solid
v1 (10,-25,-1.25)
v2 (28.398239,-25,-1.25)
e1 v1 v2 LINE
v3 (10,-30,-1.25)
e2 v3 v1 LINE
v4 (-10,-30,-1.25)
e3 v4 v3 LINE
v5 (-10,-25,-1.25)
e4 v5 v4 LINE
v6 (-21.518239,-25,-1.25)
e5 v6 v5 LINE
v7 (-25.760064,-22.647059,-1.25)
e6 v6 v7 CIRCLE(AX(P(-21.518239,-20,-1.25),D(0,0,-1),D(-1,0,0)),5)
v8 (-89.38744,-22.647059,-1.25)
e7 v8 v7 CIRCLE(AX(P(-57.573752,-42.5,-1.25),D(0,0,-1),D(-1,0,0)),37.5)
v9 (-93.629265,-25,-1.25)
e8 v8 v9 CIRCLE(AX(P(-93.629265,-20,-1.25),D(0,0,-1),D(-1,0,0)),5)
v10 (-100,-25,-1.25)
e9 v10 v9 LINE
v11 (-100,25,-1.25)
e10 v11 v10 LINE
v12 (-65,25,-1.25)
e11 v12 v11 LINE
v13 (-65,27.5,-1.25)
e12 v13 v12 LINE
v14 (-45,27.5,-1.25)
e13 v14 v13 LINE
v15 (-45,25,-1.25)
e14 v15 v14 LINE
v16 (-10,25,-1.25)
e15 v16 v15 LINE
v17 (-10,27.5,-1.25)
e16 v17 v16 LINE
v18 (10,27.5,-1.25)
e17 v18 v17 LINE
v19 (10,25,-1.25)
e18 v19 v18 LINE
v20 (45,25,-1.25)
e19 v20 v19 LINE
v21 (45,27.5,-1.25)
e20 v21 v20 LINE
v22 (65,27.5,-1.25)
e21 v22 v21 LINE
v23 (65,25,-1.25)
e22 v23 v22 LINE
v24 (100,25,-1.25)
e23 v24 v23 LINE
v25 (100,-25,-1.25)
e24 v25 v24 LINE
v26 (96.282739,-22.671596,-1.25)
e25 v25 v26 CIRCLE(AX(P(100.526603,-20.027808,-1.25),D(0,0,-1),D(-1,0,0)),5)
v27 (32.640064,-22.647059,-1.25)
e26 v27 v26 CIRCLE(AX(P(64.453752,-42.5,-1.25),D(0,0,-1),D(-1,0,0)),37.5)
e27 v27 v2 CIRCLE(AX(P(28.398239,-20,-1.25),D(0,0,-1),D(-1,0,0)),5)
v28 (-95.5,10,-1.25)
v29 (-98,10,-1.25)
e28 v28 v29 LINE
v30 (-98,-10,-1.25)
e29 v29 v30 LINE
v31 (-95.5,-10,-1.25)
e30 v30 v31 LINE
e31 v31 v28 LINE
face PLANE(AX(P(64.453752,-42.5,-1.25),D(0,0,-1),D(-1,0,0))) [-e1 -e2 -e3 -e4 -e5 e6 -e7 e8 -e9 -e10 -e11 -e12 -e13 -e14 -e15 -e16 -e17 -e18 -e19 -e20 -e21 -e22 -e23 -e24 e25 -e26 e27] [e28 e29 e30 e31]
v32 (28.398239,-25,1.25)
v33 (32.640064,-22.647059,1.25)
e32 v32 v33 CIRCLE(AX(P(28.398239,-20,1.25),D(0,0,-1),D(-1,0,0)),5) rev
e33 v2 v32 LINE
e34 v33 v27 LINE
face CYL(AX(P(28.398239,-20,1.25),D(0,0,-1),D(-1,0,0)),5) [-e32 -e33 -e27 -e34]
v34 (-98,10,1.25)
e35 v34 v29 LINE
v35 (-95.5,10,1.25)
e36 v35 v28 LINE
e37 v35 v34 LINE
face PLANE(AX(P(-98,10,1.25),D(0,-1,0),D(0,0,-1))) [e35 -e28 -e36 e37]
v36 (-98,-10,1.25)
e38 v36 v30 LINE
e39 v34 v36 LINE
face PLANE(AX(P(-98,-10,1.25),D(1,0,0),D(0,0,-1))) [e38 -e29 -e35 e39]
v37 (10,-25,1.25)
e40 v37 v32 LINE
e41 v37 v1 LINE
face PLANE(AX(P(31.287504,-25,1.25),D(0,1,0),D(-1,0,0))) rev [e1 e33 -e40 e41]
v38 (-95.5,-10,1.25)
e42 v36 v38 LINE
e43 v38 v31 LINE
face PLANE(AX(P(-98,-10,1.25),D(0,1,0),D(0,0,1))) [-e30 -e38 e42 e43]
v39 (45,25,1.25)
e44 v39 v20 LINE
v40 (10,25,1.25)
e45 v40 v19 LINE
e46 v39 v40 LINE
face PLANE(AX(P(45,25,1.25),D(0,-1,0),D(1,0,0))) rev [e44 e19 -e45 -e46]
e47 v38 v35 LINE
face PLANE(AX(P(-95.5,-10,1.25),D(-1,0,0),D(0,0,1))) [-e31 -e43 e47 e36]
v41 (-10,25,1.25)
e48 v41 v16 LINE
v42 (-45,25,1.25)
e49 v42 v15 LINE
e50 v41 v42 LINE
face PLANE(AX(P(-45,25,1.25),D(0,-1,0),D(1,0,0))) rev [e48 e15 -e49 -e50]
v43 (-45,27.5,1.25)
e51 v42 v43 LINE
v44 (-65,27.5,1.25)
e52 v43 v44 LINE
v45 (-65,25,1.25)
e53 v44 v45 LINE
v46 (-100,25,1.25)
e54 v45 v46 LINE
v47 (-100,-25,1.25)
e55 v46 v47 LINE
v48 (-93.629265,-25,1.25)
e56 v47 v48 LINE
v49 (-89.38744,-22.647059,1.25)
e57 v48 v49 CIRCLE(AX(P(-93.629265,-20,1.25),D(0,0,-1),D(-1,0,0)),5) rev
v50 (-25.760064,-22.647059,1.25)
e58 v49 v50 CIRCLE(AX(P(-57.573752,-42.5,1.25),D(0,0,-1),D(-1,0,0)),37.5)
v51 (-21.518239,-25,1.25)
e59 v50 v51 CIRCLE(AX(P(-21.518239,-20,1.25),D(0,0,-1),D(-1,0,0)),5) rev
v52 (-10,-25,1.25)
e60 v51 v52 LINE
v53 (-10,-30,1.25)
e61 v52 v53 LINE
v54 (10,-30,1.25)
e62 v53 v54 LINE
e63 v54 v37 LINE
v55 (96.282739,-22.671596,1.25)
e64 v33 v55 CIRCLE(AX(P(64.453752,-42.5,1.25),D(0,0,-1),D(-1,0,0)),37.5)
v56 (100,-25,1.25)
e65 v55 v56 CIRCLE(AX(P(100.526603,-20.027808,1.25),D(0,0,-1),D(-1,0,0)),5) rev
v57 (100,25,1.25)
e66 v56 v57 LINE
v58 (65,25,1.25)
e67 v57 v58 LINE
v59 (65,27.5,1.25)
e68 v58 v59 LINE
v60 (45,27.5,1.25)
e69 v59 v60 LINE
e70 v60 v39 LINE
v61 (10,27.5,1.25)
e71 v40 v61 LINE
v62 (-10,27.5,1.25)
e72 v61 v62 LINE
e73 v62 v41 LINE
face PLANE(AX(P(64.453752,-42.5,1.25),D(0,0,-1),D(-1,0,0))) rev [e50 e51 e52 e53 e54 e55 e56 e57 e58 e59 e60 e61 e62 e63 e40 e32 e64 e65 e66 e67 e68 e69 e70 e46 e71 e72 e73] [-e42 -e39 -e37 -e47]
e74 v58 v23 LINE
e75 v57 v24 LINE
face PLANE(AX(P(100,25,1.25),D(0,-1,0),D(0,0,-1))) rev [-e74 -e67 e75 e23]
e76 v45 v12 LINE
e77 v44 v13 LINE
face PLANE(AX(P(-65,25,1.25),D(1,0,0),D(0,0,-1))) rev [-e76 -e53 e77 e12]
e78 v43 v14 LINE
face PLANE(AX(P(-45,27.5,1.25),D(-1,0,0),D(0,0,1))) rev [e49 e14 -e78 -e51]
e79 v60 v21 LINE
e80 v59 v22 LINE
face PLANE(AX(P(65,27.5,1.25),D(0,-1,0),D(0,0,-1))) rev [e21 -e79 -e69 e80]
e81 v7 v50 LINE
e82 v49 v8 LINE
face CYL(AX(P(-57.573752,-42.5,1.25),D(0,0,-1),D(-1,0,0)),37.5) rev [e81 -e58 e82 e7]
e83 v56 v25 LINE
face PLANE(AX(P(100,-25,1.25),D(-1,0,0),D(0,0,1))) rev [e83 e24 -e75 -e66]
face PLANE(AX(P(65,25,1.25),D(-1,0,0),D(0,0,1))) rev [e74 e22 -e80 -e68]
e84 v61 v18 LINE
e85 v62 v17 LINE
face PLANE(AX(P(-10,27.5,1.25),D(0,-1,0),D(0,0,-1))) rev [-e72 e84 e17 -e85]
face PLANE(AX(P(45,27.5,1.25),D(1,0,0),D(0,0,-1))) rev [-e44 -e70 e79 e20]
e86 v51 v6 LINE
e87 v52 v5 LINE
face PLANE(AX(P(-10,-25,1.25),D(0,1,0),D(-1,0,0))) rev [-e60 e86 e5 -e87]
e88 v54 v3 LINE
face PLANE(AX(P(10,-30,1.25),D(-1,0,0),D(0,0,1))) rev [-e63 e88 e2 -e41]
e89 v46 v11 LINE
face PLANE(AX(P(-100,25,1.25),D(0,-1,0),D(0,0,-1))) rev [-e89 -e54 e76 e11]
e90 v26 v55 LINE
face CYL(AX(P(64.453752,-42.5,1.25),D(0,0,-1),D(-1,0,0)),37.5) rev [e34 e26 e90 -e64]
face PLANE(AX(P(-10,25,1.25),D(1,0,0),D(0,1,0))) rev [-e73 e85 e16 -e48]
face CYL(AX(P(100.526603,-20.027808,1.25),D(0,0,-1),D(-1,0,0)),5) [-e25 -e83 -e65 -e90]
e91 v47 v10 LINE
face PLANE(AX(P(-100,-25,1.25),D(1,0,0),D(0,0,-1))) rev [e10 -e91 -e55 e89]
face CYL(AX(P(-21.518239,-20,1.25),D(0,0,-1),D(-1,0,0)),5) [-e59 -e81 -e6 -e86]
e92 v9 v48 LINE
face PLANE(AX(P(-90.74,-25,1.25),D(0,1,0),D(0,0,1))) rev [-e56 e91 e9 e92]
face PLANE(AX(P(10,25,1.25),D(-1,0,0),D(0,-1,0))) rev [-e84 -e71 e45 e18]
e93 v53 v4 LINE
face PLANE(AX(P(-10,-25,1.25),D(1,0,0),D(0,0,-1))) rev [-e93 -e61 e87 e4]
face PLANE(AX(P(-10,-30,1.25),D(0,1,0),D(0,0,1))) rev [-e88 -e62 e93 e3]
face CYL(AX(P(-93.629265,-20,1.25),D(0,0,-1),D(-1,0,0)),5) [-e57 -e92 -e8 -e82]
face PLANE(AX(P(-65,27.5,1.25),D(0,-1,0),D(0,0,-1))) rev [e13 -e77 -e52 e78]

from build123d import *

# Parameters (mm, degrees)
SKETCH1_W           = 2.5
SKETCH1_H           = 20
BOSS_EXTRUDE1_DEPTH = 1.25
FILLET2_R           = 5


with BuildPart() as part:
    # Sketch1 → Boss-Extrude1 (new, symmetric)
    with BuildSketch(Plane.XY):
        with BuildLine():
            Line((-100, -25), (-100, 25))
            Line((-100, 25), (-65, 25))
            Line((-65, 25), (-65, 27.5))
            Line((-65, 27.5), (-45, 27.5))
            Line((-45, 27.5), (-45, 25))
            Line((-45, 25), (-10, 25))
            Line((-10, 25), (-10, 27.5))
            Line((-10, 27.5), (10, 27.5))
            Line((10, 27.5), (10, 25))
            Line((10, 25), (45, 25))
            Line((45, 25), (45, 27.5))
            Line((45, 27.5), (65, 27.5))
            Line((65, 27.5), (65, 25))
            Line((65, 25), (100, 25))
            Line((100, 25), (100, -25))
            Line((100, -25), (97.62, -25))
            ThreePointArc((97.62, -25), (64.453752096, -5), (31.287504193, -25))
            Line((31.287504193, -25), (10, -25))
            Line((10, -25), (10, -30))
            Line((10, -30), (-10, -30))
            Line((-10, -30), (-10, -25))
            Line((-10, -25), (-24.407504193, -25))
            ThreePointArc((-24.407504193, -25), (-57.573752096, -5), (-90.74, -25))
            Line((-90.74, -25), (-100, -25))
        make_face()
        with Locations((-96.75, 0)):
            Rectangle(SKETCH1_W, SKETCH1_H, mode=Mode.SUBTRACT)
    extrude(amount=BOSS_EXTRUDE1_DEPTH, both=True)

    # Fillet2
    # the kernel refuses this fillet: 5 mm, written as the material it takes off along each edge
    with BuildSketch(Plane(origin=(97.62, -25, 7.962737252), x_dir=(-0.49803133074323064, 0.8671590359317758, 0), z_dir=(0, 0, -1))) as fillet2_piece_1:
        with BuildLine():
            CenterArc((2.864101227, 4.996794646), FILLET2_R, 215.915482701, 52.032817446)
            Line((-1.185314567, 2.063838506), (-1.266302883, 2.005179383))
            ThreePointArc((-1.266302883, 2.005179383), (-0.679373187, 0.98211612), (-0.086715904, -0.049803133))
            Line((-0.086715904, -0.049803133), (0.003580127, -0.099935893))
            ThreePointArc((0.003580127, -0.099935893), (1.34254745, -0.075959846), (2.681514774, -0.099935893))
            Line((2.681514774, -0.099935893), (2.685094901, 0))
        make_face()
    extrude(amount=15.925474504, mode=Mode.SUBTRACT)
    with BuildSketch(Plane(origin=(31.287504193, -25, 8.473162128), x_dir=(-1, 0, 0), z_dir=(0, 0, -1))) as fillet2_piece_2:
        with BuildLine():
            CenterArc((2.889264851, 5), FILLET2_R, 211.965718751, 58.034281249)
            Line((-1.352560179, 2.352941176), (-1.437396679, 2.3))
            ThreePointArc((-1.437396679, 2.3), (-0.741683603, 1.138874159), (-0.088443328, -0.046666667))
            Line((-0.088443328, -0.046666667), (0, -0.1))
            Line((0, -0.1), (2.889264851, -0.1))
            Line((2.889264851, -0.1), (2.889264851, 0))
        make_face()
    extrude(amount=16.946324255, mode=Mode.SUBTRACT)
    with BuildSketch(Plane(origin=(-24.407504193, -25, -8.473162128), x_dir=(-0.4983656192119462, 0.8669669599168663, 0), z_dir=(0, 0, 1)), Plane(origin=(-90.74, -25, 8.473162128), x_dir=(0.4983656192119447, 0.8669669599168673, 0), z_dir=(0, 0, -1))) as fillet2_piece_3:
        with BuildLine():
            CenterArc((2.894924533, -4.99672526), FILLET2_R, 92.073789733, 58.034281249)
            Line((-1.439910267, -2.504897164), (-1.526606963, -2.455060602))
            Line((-1.526606963, -2.455060602), (-0.086696696, 0.049836562))
            Line((-0.086696696, 0.049836562), (0.003618656, 0.099934505))
            ThreePointArc((0.003618656, 0.099934505), (1.356995875, 0.075439453), (2.710373094, 0.099934505))
            Line((2.710373094, 0.099934505), (2.71399175, 0))
        make_face()
    extrude(amount=16.946324255, mode=Mode.SUBTRACT)


solid = part.part
